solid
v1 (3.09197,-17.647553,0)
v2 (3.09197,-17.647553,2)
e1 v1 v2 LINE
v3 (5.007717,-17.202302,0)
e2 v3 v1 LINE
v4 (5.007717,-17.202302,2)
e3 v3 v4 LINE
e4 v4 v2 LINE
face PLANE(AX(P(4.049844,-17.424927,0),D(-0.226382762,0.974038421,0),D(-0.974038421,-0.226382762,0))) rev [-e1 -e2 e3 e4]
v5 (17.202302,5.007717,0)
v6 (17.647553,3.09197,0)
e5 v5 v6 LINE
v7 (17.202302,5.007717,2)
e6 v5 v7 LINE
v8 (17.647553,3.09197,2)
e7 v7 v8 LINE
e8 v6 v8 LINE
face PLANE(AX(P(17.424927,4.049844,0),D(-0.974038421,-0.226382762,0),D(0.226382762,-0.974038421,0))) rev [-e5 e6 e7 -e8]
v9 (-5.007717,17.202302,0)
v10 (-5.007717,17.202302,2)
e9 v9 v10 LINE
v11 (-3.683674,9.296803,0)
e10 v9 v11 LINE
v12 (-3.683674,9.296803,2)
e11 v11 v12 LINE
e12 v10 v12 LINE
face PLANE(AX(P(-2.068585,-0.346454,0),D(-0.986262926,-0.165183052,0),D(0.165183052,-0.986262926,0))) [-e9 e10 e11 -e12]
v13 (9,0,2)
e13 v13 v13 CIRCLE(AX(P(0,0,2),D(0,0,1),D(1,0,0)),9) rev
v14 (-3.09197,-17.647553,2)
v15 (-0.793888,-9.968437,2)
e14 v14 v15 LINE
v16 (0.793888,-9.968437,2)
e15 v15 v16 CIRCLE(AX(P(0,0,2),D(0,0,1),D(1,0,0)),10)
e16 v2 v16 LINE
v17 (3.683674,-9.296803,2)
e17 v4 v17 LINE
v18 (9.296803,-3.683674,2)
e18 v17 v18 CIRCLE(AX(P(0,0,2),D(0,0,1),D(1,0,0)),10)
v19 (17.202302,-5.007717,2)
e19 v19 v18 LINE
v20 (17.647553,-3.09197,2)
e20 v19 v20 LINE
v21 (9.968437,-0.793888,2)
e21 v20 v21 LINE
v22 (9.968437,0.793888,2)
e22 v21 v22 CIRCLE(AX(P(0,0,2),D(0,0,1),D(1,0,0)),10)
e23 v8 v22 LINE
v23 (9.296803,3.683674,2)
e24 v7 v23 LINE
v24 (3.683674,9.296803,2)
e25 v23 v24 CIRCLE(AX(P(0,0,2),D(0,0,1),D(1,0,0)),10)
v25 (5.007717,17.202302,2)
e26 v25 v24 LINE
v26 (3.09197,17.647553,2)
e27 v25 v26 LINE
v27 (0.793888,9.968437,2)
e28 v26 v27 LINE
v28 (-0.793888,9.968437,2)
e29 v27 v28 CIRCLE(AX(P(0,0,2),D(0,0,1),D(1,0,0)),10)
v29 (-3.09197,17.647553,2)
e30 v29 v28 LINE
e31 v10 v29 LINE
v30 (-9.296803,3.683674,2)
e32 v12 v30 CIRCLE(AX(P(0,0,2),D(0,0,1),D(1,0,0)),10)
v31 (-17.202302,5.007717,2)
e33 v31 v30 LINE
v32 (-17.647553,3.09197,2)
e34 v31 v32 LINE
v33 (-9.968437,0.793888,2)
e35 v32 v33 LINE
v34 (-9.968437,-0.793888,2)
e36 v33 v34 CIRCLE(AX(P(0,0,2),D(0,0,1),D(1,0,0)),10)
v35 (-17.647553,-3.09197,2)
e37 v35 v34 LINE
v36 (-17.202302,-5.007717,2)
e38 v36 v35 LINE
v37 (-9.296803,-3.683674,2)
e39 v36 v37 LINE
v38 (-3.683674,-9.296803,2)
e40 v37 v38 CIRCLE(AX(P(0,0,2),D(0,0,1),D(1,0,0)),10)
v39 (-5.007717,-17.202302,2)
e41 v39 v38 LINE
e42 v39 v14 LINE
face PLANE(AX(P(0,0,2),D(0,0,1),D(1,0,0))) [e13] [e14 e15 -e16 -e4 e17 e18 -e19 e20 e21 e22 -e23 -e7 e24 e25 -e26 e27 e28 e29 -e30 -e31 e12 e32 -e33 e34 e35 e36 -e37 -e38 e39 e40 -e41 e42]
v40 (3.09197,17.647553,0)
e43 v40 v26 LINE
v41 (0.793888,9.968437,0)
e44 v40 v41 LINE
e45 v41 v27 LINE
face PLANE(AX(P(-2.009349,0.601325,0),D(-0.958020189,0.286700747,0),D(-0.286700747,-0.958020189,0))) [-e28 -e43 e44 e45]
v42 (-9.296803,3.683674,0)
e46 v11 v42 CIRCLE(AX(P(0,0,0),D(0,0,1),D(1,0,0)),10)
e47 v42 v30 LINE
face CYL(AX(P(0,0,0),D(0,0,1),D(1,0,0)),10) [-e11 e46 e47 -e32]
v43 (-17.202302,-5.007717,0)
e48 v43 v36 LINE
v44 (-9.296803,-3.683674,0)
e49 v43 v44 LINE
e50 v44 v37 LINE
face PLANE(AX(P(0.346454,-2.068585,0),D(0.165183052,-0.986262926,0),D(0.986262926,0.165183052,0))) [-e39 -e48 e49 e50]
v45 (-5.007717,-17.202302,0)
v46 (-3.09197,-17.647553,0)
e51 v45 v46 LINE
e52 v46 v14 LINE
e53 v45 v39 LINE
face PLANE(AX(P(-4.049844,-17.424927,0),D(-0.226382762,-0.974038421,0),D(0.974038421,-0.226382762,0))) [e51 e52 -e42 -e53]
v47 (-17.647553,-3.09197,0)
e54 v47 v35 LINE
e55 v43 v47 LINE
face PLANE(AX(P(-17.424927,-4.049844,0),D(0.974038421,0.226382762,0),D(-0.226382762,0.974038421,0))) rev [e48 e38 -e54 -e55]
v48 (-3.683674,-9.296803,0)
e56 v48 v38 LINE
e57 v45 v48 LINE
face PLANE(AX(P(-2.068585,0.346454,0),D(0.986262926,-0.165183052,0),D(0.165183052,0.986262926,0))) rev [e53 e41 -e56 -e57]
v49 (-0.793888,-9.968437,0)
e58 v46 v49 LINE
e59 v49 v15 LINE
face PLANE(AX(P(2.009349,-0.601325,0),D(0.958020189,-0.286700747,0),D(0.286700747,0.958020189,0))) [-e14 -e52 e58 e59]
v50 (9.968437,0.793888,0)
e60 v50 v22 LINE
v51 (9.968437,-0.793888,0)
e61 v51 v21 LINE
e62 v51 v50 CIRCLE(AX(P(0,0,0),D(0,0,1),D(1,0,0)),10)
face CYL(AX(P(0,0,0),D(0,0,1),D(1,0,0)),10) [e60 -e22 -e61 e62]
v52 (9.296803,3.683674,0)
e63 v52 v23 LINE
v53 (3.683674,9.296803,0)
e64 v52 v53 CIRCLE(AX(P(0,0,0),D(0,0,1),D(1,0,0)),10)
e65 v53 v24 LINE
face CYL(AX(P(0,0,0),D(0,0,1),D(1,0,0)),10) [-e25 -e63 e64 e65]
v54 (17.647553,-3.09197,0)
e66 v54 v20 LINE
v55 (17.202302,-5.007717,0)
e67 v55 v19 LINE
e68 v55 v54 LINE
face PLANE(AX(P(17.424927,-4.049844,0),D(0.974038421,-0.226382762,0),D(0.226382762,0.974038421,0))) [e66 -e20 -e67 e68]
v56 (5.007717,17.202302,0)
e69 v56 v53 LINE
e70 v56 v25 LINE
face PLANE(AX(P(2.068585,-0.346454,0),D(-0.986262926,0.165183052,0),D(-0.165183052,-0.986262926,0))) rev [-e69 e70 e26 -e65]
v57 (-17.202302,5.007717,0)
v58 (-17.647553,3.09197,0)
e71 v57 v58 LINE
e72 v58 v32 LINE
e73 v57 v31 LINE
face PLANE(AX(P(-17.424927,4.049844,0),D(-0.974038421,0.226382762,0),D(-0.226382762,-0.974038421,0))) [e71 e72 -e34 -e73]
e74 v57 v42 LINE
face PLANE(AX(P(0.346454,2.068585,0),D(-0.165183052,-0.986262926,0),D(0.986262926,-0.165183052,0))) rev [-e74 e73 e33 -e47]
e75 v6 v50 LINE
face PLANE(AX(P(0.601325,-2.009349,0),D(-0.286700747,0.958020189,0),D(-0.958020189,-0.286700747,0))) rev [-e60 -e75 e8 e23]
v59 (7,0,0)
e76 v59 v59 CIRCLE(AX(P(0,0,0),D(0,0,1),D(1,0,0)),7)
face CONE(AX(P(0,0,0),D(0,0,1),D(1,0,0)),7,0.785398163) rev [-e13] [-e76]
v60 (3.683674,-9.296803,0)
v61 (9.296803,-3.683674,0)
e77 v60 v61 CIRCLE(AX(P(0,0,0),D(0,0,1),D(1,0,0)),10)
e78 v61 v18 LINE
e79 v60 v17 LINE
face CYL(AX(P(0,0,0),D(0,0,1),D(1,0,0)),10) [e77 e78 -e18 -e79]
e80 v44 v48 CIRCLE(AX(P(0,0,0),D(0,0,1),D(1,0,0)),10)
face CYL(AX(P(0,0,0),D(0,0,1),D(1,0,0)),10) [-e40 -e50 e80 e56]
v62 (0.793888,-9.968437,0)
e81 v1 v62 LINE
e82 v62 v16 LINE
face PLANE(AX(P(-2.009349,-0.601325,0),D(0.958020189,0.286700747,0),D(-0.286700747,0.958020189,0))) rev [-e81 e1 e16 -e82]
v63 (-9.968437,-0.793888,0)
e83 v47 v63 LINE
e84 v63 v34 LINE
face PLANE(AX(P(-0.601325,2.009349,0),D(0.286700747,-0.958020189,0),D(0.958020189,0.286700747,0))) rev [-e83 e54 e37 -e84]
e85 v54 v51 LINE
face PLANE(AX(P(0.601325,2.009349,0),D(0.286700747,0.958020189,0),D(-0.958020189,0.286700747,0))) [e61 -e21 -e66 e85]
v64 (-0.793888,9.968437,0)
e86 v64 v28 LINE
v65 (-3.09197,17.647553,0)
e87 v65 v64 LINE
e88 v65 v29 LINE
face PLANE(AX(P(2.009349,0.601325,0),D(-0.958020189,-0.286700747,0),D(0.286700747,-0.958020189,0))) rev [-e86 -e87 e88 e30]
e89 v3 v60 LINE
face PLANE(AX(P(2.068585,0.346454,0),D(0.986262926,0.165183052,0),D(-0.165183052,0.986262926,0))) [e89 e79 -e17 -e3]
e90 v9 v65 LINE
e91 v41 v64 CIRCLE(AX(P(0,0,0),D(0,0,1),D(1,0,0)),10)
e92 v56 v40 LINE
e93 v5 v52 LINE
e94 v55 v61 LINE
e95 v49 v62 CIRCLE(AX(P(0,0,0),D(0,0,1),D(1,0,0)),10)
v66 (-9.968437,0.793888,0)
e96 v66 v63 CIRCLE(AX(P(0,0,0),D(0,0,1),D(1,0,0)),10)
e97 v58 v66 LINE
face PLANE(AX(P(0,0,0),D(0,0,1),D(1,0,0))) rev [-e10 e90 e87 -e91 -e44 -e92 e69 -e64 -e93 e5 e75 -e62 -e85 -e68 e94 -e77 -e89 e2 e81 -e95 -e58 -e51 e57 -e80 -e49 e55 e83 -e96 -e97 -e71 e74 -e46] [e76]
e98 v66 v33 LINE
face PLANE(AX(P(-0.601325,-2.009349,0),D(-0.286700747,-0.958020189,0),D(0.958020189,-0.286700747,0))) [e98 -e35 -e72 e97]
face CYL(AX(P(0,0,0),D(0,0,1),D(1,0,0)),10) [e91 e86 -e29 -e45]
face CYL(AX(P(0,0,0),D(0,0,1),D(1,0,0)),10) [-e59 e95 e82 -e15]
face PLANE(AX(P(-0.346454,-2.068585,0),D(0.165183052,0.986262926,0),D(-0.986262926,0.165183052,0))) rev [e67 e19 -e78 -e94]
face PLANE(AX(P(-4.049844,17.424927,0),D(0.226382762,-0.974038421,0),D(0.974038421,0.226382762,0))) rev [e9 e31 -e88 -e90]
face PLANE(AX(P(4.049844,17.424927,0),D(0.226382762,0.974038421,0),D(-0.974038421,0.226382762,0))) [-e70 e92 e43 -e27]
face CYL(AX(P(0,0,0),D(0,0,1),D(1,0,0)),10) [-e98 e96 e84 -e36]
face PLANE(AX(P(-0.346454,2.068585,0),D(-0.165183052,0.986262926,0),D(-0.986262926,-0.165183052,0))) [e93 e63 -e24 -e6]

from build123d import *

# Parameters (mm, degrees)
SKETCH_1_R              = 20
EXTRUDE_1_DEPTH         = 2
SKETCH_2_R              = 7
CUT_EXTRUDE_1_DEPTH     = 2
CUT_EXTRUDE_START       = -2
CUT_EXTRUDE_2_OUTLINE_R = 20
CUT_EXTRUDE_2_DEPTH     = 2
CHAMFER_4_SIZE          = 2


# Read off the part's stored shape, not the designer's step: 切除-拉伸2
with BuildPart() as part:
    # 草图1 → 凸台-拉伸1 (new body)
    with BuildSketch(Plane.XY):
        Circle(SKETCH_1_R)
    extrude(amount=EXTRUDE_1_DEPTH)

    # 草图2 → 切除-拉伸1 (cut)
    with BuildSketch(Plane.XY.offset(2)):
        Circle(SKETCH_2_R)
    extrude(amount=-CUT_EXTRUDE_1_DEPTH, mode=Mode.SUBTRACT)

    # 切除-拉伸2 outline → 切除-拉伸2 (cut)
    with BuildSketch(Plane.XY.offset(2).offset(CUT_EXTRUDE_START)):
        Circle(CUT_EXTRUDE_2_OUTLINE_R)
        with BuildLine():
            Line((-3.683674436, 9.296802819), (-5.007717322, 17.202301566))
            Line((-5.007717322, 17.202301566), (-3.091969732, 17.647553233))
            Line((-3.091969732, 17.647553233), (-0.793888425, 9.968437248))
            ThreePointArc((-0.793888425, 9.968437248), (0, 10), (0.793888425, 9.968437248))
            Line((0.793888425, 9.968437248), (3.091969732, 17.647553233))
            Line((3.091969732, 17.647553233), (5.007717322, 17.202301566))
            Line((5.007717322, 17.202301566), (3.683674436, 9.296802819))
            ThreePointArc((3.683674436, 9.296802819), (7.071067812, 7.071067812), (9.296802819, 3.683674436))
            Line((9.296802819, 3.683674436), (17.202301566, 5.007717322))
            Line((17.202301566, 5.007717322), (17.647553233, 3.091969732))
            Line((17.647553233, 3.091969732), (9.968437248, 0.793888425))
            ThreePointArc((9.968437248, 0.793888425), (10, 0), (9.968437248, -0.793888425))
            Line((9.968437248, -0.793888425), (17.647553233, -3.091969732))
            Line((17.647553233, -3.091969732), (17.202301566, -5.007717322))
            Line((17.202301566, -5.007717322), (9.296802819, -3.683674436))
            ThreePointArc((9.296802819, -3.683674436), (7.071067812, -7.071067812), (3.683674436, -9.296802819))
            Line((3.683674436, -9.296802819), (5.007717322, -17.202301566))
            Line((5.007717322, -17.202301566), (3.091969732, -17.647553233))
            Line((3.091969732, -17.647553233), (0.793888425, -9.968437248))
            ThreePointArc((0.793888425, -9.968437248), (0, -10), (-0.793888425, -9.968437248))
            Line((-0.793888425, -9.968437248), (-3.091969732, -17.647553233))
            Line((-3.091969732, -17.647553233), (-5.007717322, -17.202301566))
            Line((-5.007717322, -17.202301566), (-3.683674436, -9.296802819))
            ThreePointArc((-3.683674436, -9.296802819), (-7.071067812, -7.071067812), (-9.296802819, -3.683674436))
            Line((-9.296802819, -3.683674436), (-17.202301566, -5.007717322))
            Line((-17.202301566, -5.007717322), (-17.647553233, -3.091969732))
            Line((-17.647553233, -3.091969732), (-9.968437248, -0.793888425))
            ThreePointArc((-9.968437248, -0.793888425), (-10, 0), (-9.968437248, 0.793888425))
            Line((-9.968437248, 0.793888425), (-17.647553233, 3.091969732))
            Line((-17.647553233, 3.091969732), (-17.202301566, 5.007717322))
            Line((-17.202301566, 5.007717322), (-9.296802819, 3.683674436))
            ThreePointArc((-9.296802819, 3.683674436), (-7.071067812, 7.071067812), (-3.683674436, 9.296802819))
        make_face(mode=Mode.SUBTRACT)
    extrude(amount=CUT_EXTRUDE_2_DEPTH, mode=Mode.SUBTRACT)

    # 倒角4
    chamfer_4_edges = [part.edges().sort_by_distance(p)[0] for p in [
        (-7, 0, 2),
    ]]
    chamfer(chamfer_4_edges, length=CHAMFER_4_SIZE - 0.0001)  # a hair under: the kernel refuses the full size


solid = part.part
